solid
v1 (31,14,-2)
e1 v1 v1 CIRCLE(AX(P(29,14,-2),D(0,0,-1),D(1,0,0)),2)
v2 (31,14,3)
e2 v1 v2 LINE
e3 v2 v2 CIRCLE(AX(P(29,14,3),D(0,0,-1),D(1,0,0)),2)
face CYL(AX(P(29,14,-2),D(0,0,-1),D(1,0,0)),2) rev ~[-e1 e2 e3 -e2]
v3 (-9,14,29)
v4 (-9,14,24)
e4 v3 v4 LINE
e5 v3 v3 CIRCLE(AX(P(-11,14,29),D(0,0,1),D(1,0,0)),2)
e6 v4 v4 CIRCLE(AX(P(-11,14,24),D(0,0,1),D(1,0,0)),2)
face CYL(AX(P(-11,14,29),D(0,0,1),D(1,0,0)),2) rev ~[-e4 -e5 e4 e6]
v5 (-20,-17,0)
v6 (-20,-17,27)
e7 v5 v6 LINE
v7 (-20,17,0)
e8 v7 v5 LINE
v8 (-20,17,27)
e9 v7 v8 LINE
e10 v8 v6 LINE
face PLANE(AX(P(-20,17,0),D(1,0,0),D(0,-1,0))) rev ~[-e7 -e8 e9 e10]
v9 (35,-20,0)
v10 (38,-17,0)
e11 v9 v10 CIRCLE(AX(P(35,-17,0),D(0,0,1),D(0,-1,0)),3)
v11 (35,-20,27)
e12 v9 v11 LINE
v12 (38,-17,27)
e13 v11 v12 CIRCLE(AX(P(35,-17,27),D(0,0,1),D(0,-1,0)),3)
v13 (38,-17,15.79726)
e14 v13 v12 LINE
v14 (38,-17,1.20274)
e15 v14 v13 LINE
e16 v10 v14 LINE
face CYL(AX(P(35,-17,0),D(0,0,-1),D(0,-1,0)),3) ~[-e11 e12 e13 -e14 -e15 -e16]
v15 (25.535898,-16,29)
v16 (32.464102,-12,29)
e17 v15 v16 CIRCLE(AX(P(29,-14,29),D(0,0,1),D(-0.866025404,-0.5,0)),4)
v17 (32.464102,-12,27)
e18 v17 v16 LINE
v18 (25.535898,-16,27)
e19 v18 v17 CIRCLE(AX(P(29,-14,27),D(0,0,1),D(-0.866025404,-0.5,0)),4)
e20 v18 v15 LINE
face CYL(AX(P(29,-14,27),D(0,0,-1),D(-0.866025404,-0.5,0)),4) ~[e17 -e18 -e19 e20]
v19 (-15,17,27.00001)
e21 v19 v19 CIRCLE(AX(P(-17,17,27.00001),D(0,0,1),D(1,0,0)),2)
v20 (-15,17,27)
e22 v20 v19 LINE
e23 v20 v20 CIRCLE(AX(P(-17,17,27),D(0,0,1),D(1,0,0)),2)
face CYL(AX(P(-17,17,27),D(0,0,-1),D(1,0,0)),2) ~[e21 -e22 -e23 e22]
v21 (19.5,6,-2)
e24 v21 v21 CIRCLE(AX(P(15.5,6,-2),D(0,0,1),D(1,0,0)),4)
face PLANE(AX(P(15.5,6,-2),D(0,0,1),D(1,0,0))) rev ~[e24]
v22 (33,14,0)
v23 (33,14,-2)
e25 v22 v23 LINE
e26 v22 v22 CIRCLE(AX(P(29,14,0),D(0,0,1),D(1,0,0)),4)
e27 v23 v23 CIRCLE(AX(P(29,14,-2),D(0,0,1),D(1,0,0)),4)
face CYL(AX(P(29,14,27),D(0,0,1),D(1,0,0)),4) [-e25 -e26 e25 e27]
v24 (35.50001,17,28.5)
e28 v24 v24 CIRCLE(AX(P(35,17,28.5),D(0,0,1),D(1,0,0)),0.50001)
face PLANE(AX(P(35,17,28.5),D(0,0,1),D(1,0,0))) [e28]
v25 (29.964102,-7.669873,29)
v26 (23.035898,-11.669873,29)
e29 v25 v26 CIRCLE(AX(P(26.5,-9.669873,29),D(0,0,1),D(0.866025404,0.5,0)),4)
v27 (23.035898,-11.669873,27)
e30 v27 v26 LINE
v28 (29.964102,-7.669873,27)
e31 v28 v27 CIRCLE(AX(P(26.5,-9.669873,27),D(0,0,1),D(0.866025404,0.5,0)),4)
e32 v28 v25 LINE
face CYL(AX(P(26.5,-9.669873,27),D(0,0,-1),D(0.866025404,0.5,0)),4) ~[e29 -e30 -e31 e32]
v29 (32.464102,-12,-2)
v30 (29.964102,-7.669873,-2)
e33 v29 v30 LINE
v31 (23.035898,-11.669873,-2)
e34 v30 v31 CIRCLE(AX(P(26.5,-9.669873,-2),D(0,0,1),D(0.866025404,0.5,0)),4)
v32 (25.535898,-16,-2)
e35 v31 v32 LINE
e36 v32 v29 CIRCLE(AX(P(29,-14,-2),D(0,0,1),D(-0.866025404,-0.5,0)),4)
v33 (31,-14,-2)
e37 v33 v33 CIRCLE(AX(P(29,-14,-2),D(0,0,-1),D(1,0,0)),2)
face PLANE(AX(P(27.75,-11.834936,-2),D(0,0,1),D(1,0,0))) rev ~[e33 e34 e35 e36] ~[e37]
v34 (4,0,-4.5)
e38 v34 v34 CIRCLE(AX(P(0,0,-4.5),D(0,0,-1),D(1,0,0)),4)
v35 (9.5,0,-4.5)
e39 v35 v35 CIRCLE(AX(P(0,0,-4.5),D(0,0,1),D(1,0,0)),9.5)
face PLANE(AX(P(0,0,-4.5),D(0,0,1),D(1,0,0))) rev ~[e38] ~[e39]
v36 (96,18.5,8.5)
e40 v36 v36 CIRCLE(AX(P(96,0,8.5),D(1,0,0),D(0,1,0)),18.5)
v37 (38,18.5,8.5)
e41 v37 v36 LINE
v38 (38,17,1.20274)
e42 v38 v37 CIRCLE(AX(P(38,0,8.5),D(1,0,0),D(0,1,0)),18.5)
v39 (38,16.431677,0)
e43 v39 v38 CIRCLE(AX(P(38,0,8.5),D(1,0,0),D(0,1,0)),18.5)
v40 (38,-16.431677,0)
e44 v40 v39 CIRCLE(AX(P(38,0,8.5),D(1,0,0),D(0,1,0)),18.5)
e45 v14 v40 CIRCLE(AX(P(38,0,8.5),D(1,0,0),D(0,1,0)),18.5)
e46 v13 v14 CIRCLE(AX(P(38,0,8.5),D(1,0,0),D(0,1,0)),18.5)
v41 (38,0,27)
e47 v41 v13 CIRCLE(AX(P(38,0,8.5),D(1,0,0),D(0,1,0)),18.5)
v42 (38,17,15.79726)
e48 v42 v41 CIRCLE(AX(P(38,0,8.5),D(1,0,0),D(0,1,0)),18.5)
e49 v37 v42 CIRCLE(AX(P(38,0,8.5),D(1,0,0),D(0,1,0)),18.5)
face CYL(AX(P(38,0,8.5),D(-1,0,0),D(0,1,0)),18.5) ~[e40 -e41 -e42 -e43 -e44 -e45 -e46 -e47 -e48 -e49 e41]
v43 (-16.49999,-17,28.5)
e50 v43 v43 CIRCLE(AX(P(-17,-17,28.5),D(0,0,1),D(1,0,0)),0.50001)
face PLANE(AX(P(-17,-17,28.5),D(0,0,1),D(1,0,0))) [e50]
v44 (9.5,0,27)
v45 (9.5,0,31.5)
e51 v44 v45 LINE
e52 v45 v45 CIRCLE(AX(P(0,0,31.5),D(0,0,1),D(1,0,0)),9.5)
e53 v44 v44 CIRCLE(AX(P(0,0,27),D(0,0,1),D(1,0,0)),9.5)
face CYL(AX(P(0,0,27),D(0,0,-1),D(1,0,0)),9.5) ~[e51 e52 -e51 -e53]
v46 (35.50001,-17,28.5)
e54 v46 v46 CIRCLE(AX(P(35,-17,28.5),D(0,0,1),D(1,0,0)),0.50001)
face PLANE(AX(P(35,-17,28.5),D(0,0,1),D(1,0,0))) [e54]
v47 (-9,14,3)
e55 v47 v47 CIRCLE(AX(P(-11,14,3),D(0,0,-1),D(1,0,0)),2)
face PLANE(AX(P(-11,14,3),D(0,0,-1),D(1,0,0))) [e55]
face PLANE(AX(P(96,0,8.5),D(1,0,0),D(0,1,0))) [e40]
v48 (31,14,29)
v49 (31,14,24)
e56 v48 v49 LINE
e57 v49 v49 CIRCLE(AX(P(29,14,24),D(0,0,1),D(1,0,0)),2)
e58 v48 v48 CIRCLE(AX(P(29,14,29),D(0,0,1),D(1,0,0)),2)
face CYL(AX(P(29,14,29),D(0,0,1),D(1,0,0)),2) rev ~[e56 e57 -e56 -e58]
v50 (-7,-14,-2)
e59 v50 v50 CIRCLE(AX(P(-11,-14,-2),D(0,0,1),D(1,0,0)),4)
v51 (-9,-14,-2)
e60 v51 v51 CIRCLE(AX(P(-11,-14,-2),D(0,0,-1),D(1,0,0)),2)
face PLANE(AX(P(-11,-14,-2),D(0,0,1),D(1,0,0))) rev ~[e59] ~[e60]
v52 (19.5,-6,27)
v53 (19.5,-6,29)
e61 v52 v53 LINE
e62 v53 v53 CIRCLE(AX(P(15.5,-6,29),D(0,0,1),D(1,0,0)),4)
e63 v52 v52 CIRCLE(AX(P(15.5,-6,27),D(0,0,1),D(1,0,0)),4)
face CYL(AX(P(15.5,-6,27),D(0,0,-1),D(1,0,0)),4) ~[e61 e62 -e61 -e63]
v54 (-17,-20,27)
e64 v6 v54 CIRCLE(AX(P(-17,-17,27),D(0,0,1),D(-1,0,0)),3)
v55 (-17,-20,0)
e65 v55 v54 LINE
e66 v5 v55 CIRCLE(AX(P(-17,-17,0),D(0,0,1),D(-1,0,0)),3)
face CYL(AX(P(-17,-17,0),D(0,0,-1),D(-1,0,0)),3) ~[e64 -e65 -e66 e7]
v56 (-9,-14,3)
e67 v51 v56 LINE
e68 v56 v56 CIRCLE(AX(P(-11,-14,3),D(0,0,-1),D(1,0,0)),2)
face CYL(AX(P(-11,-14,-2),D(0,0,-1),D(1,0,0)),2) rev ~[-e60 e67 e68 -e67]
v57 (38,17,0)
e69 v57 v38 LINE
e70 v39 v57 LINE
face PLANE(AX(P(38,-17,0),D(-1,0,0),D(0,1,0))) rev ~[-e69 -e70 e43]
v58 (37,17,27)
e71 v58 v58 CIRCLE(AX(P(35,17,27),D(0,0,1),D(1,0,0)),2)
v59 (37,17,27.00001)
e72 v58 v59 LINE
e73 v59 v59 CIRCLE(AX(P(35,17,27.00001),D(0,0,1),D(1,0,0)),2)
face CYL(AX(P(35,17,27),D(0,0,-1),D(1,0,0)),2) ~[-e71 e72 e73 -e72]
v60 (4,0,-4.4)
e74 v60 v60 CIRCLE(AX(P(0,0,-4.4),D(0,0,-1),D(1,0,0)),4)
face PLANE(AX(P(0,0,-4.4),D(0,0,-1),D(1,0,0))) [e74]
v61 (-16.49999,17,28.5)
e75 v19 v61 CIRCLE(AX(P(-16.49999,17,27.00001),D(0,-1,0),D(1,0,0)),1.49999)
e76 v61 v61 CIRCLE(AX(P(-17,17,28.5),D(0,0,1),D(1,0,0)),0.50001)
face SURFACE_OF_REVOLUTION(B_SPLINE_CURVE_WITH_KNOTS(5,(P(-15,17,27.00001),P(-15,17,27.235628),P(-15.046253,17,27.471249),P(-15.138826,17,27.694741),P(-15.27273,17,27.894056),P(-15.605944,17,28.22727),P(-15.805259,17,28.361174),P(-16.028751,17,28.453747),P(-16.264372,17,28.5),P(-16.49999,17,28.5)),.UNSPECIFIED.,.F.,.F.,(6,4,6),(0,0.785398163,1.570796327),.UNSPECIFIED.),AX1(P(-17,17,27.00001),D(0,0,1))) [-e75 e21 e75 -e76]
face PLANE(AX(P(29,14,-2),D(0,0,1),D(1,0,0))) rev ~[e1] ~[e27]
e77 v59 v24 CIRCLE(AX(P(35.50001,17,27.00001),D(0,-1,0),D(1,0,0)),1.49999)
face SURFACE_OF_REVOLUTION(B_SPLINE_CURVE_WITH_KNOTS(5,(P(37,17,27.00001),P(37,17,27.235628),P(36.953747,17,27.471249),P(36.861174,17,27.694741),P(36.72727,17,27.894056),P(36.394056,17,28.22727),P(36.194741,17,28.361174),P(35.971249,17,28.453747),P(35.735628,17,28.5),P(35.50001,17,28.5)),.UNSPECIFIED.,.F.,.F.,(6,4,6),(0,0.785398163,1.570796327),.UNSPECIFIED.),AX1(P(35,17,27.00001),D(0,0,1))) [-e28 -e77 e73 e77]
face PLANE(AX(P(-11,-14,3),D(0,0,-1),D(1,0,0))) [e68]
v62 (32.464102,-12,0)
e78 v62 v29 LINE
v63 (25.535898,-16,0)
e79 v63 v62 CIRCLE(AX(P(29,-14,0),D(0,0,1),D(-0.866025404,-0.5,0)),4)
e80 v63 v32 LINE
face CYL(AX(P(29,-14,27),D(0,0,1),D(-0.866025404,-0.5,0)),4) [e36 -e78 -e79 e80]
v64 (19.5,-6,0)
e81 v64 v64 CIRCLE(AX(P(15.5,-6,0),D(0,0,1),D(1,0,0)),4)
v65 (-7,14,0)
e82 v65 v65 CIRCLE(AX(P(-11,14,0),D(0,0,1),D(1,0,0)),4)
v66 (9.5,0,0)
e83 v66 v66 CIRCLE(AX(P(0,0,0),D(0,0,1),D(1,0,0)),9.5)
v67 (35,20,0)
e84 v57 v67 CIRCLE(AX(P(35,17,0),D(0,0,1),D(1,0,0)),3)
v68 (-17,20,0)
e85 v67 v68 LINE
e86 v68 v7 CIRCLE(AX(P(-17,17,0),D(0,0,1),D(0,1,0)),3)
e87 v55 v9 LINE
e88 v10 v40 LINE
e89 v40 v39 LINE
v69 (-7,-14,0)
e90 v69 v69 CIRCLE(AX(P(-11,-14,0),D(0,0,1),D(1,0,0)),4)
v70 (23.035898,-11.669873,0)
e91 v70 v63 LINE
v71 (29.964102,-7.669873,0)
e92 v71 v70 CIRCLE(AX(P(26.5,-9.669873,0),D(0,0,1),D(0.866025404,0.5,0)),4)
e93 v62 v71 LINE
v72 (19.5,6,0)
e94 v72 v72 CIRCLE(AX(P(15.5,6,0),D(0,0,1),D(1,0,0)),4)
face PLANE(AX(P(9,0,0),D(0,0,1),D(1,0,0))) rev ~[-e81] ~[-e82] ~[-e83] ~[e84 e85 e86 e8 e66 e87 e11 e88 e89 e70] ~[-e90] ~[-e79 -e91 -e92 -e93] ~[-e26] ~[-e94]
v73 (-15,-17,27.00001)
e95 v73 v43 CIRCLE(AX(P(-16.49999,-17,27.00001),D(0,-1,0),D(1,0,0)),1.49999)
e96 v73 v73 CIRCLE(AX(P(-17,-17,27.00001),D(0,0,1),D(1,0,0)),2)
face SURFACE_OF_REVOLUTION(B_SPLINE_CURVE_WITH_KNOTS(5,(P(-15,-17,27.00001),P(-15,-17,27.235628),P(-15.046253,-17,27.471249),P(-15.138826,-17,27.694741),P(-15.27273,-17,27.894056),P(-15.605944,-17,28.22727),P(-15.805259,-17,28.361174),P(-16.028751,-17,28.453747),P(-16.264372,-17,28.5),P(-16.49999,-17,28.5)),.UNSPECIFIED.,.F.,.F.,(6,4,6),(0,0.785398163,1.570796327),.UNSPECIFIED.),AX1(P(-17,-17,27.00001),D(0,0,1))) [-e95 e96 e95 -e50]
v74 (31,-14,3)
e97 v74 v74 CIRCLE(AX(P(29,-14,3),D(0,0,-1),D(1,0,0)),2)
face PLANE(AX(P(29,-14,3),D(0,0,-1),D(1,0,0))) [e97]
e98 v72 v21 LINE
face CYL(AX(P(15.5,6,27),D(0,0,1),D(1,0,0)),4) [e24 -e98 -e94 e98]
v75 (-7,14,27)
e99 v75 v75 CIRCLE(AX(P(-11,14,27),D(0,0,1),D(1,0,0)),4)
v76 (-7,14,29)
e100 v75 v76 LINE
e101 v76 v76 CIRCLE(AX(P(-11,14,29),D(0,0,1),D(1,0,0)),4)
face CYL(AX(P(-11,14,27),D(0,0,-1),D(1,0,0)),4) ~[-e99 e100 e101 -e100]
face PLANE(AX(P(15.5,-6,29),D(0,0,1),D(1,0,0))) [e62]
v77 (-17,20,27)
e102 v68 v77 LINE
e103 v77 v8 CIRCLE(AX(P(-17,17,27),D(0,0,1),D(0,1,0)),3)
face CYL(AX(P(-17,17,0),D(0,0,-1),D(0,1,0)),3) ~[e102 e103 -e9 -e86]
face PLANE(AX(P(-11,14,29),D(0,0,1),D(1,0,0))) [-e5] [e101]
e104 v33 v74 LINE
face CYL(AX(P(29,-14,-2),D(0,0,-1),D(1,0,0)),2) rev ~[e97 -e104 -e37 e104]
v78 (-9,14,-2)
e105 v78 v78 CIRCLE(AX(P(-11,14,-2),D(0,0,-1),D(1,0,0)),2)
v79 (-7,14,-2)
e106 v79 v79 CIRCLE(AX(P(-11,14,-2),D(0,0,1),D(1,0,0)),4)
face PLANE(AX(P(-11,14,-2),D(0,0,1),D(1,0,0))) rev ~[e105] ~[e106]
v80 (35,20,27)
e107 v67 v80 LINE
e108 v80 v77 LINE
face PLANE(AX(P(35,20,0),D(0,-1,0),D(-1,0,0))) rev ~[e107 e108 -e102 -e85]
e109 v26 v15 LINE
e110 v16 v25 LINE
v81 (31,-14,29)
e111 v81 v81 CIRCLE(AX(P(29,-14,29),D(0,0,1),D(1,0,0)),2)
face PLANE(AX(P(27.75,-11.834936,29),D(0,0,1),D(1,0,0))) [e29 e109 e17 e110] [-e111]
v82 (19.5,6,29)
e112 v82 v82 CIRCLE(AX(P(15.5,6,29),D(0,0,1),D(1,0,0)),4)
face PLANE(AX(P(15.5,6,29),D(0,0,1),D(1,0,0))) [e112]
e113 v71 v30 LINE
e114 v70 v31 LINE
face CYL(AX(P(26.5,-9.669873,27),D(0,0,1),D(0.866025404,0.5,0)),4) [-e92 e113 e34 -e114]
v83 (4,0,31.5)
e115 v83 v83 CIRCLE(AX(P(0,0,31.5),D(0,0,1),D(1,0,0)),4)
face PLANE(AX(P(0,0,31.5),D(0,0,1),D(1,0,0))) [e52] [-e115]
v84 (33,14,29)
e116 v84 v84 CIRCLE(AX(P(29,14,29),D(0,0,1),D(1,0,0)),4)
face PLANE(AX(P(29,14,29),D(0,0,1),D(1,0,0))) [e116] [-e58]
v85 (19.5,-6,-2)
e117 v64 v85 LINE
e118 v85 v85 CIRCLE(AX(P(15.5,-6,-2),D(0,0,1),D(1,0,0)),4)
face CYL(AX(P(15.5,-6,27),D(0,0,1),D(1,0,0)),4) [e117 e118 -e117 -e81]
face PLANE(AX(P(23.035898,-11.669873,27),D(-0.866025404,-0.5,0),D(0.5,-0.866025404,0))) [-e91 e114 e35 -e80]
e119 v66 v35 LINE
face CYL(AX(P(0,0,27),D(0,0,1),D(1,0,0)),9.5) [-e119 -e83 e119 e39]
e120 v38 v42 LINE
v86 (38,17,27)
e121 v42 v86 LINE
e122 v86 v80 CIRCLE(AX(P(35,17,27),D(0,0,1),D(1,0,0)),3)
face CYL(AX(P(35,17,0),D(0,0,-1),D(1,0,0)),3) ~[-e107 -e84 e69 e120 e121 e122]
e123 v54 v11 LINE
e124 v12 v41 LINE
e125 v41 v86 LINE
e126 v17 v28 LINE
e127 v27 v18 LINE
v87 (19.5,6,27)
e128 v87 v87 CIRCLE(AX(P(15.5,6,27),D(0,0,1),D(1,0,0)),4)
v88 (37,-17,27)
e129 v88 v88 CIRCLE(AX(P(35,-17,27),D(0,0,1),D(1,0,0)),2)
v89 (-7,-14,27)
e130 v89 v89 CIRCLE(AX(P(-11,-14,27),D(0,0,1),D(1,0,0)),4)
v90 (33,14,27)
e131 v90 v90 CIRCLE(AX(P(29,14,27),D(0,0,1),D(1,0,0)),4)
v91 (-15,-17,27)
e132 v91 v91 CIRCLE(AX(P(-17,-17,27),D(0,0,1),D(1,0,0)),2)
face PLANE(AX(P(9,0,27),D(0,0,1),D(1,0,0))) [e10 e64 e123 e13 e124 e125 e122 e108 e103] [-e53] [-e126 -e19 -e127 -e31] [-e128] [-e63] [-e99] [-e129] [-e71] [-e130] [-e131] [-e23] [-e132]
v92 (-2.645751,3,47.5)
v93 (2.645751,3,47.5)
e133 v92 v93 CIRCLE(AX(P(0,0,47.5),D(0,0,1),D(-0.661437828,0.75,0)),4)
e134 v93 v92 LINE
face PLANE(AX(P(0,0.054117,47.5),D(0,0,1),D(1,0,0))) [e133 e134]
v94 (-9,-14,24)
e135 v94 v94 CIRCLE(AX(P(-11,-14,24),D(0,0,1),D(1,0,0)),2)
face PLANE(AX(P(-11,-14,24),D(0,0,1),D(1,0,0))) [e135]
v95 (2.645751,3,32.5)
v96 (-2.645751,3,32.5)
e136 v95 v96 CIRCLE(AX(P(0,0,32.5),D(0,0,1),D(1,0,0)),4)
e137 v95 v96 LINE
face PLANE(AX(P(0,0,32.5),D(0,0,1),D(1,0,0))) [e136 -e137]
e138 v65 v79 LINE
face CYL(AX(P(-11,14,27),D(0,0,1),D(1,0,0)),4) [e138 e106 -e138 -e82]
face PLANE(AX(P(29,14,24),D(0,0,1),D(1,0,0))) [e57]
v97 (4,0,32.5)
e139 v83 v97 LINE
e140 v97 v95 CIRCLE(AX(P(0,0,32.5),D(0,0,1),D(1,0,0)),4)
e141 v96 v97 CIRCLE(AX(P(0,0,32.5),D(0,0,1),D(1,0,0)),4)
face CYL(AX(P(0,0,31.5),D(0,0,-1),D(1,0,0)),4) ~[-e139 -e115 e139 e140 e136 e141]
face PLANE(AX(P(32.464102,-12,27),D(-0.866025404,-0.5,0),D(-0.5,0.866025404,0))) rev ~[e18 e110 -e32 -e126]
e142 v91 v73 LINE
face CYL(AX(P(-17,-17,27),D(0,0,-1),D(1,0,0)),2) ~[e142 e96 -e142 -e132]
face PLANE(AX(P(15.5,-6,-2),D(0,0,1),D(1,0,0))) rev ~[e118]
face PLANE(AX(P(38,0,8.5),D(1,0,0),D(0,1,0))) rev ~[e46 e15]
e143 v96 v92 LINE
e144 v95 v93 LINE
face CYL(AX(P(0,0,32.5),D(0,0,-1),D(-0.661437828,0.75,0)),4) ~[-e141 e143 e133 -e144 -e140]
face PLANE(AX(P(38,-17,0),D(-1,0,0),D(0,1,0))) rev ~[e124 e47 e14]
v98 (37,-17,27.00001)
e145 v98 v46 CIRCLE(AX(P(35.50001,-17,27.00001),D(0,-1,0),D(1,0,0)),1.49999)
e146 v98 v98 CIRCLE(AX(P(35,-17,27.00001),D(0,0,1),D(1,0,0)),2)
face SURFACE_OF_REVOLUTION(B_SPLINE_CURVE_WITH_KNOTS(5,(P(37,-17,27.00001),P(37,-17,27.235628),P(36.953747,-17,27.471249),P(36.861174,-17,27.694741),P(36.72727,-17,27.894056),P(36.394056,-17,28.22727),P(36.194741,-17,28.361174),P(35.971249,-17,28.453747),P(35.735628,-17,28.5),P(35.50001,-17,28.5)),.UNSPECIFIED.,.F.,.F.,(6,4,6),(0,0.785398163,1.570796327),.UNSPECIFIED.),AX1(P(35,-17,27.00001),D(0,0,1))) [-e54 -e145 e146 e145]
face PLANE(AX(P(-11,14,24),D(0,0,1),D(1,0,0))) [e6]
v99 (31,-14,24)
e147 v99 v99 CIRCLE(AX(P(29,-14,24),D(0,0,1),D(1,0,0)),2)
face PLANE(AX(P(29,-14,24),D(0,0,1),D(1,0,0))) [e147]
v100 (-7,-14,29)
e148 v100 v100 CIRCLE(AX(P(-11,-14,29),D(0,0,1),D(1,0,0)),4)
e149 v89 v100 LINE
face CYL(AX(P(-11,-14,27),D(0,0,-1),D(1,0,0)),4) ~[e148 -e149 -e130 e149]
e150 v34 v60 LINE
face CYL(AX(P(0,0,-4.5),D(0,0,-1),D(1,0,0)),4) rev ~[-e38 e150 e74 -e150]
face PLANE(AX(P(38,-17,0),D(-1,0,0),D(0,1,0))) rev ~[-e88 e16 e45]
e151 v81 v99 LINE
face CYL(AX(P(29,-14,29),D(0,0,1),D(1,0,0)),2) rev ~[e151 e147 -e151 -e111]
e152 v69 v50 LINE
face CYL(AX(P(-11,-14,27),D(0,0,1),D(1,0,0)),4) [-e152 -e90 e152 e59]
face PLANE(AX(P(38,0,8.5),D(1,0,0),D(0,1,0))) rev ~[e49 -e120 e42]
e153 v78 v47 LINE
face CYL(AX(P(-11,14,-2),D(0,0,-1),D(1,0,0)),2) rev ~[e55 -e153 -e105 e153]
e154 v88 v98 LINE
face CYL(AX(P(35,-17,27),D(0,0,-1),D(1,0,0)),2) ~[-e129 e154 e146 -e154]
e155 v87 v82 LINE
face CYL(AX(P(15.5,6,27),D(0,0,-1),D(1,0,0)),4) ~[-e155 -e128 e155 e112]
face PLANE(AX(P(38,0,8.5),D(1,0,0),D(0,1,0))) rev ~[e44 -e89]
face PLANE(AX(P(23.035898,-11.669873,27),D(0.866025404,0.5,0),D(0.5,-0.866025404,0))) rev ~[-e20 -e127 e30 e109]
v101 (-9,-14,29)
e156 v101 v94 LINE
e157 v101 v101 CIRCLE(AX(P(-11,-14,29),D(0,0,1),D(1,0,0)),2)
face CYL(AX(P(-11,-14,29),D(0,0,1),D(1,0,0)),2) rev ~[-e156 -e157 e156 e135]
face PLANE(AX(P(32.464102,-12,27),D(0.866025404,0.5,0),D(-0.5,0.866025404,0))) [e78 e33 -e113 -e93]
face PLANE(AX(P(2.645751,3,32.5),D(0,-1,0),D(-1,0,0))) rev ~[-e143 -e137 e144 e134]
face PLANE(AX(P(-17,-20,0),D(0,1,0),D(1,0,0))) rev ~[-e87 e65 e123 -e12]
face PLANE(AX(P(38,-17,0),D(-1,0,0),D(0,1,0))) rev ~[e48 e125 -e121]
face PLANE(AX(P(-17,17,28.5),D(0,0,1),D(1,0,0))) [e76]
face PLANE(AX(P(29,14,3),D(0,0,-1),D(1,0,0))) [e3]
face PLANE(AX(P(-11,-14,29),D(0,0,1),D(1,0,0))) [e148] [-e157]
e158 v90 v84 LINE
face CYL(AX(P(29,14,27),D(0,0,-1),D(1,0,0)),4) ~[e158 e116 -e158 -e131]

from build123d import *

# Parameters (mm, degrees)
F1_DEPTH  = 27
F2_R      = 4
F3_DEPTH  = 2
F4_DEPTH  = 29
F5_R      = 9.5
F6_DEPTH  = 4.5
F7_DEPTH  = 31.5
F8_R      = 4
F9_DEPTH  = 1
F11_DEPTH = 15
F12_R     = 4
F13_DEPTH = 0.1
F14_R     = 18.5
F15_DEPTH = 58
F16_R     = 2
F17_DEPTH = 1.5
F18_R     = 1.49999
F19_R     = 2
F20_DEPTH = 5
F21_R     = 2
F22_DEPTH = 5


# Not quite as in the source:
# - a fillet or chamfer is up to 0.001 mm smaller than in the source, because OpenCascade refuses the exact size


with BuildPart() as f1:
    # F0 (on Top) → F1 (new body)
    with BuildSketch(Plane.XY):
        with BuildLine():
            ThreePointArc((38, 17), (37.1213203436, 19.1213203436), (35, 20))
            Line((35, 20), (-17, 20))
            ThreePointArc((-17, 20), (-19.1213203436, 19.1213203436), (-20, 17))
            Line((-20, 17), (-20, -17))
            ThreePointArc((-20, -17), (-19.1213203436, -19.1213203436), (-17, -20))
            Line((-17, -20), (35, -20))
            ThreePointArc((35, -20), (37.1213203436, -19.1213203436), (38, -17))
            Line((38, -17), (38, 17))
        make_face()
    extrude(amount=F1_DEPTH)

    # F2 (on face) → F3 (join)
    with BuildSketch(Plane.XY.offset(27)):
        with Locations((-11, 14)):
            Circle(F2_R)
        with Locations((29, 14)):
            Circle(F2_R)
        with Locations((-11, -14)):
            Circle(F2_R)
        with BuildLine():
            Line((32.4641016151, -12), (29.9641016151, -7.6698729811))
            ThreePointArc((29.9641016151, -7.6698729811), (24.5, -6.2057713659), (23.0358983849, -11.6698729811))
            Line((23.0358983849, -11.6698729811), (25.5358983849, -16))
            ThreePointArc((25.5358983849, -16), (31, -17.4641016151), (32.4641016151, -12))
        make_face()
        with Locations((15.5, 6)):
            Circle(F2_R)
        with Locations((15.5, -6)):
            Circle(F2_R)
    extrude(amount=F3_DEPTH)

    # F2 (on face) → F4 (join)
    with BuildSketch(Plane.XY.offset(27)):
        with Locations((-11, 14)):
            Circle(F2_R)
        with Locations((29, 14)):
            Circle(F2_R)
        with Locations((-11, -14)):
            Circle(F2_R)
        with BuildLine():
            Line((32.4641016151, -12), (29.9641016151, -7.6698729811))
            ThreePointArc((29.9641016151, -7.6698729811), (24.5, -6.2057713659), (23.0358983849, -11.6698729811))
            Line((23.0358983849, -11.6698729811), (25.5358983849, -16))
            ThreePointArc((25.5358983849, -16), (31, -17.4641016151), (32.4641016151, -12))
        make_face()
        with Locations((15.5, 6)):
            Circle(F2_R)
        with Locations((15.5, -6)):
            Circle(F2_R)
    extrude(amount=-F4_DEPTH)

    # F5 (on face) → F6 (join)
    with BuildSketch(Plane.XY.offset(27)):
        Circle(F5_R)
    extrude(amount=F6_DEPTH)

    # F5 (on face) → F7 (join)
    with BuildSketch(Plane.XY.offset(27)):
        Circle(F5_R)
    extrude(amount=-F7_DEPTH)

    # F8 (on face) → F9 (join)
    with BuildSketch(Plane.XY.offset(31.5)):
        Circle(F8_R)
    extrude(amount=F9_DEPTH)

    # F10 (on face) → F11 (join)
    with BuildSketch(Plane.XY.offset(32.5)):
        with BuildLine():
            Line((2.6457513111, 3), (-2.6457513111, 3))
            ThreePointArc((-2.6457513111, 3), (0, -4), (2.6457513111, 3))
        make_face()
    extrude(amount=F11_DEPTH)

    # F12 (on face) → F13 (cut)
    with BuildSketch(Plane(origin=(0, 0, -4.5), x_dir=(1, 0, 0), z_dir=(0, 0, -1))):
        Circle(F12_R)
    extrude(amount=-F13_DEPTH, mode=Mode.SUBTRACT)

    # F14 (on face) → F15 (join)
    with BuildSketch(Plane.YZ.offset(38)):
        with Locations((0, 8.5)):
            Circle(F14_R)
    extrude(amount=F15_DEPTH)

    # F16 (on face) → F17 (join)
    with BuildSketch(Plane.XY.offset(27)):
        with Locations((-17, 17)):
            Circle(F16_R)
        with Locations((35, 17)):
            Circle(F16_R)
        with Locations((35, -17)):
            Circle(F16_R)
        with Locations((-17, -17)):
            Circle(F16_R)
    extrude(amount=F17_DEPTH)

    # F18 (radius 1.5 in the source; OpenCascade refuses exactly that, so slightly less here)
    f18_edges = [f1.edges().sort_by_distance(p)[0] for p in [
        (-19, 17, 28.5),
        (-19, -17, 28.5),
        (33, -17, 28.5),
        (33, 17, 28.5),
    ]]
    fillet(f18_edges, radius=F18_R)

    # F19 (on face) → F20 (cut)
    with BuildSketch(Plane.XY.offset(29)):
        with Locations((-11, 14)):
            Circle(F19_R)
        with Locations((-11, -14)):
            Circle(F19_R)
        with Locations((29, -14)):
            Circle(F19_R)
        with Locations((29, 14)):
            Circle(F19_R)
    extrude(amount=-F20_DEPTH, mode=Mode.SUBTRACT)

    # F21 (on face) → F22 (cut)
    with BuildSketch(Plane(origin=(0, 0, -2), x_dir=(1, 0, 0), z_dir=(0, 0, -1))):
        with Locations((29, 14)):
            Circle(F21_R)
        with Locations((29, -14)):
            Circle(F21_R)
        with Locations((-11, -14)):
            Circle(F21_R)
        with Locations((-11, 14)):
            Circle(F21_R)
    extrude(amount=-F22_DEPTH, mode=Mode.SUBTRACT)


solid = f1.part
